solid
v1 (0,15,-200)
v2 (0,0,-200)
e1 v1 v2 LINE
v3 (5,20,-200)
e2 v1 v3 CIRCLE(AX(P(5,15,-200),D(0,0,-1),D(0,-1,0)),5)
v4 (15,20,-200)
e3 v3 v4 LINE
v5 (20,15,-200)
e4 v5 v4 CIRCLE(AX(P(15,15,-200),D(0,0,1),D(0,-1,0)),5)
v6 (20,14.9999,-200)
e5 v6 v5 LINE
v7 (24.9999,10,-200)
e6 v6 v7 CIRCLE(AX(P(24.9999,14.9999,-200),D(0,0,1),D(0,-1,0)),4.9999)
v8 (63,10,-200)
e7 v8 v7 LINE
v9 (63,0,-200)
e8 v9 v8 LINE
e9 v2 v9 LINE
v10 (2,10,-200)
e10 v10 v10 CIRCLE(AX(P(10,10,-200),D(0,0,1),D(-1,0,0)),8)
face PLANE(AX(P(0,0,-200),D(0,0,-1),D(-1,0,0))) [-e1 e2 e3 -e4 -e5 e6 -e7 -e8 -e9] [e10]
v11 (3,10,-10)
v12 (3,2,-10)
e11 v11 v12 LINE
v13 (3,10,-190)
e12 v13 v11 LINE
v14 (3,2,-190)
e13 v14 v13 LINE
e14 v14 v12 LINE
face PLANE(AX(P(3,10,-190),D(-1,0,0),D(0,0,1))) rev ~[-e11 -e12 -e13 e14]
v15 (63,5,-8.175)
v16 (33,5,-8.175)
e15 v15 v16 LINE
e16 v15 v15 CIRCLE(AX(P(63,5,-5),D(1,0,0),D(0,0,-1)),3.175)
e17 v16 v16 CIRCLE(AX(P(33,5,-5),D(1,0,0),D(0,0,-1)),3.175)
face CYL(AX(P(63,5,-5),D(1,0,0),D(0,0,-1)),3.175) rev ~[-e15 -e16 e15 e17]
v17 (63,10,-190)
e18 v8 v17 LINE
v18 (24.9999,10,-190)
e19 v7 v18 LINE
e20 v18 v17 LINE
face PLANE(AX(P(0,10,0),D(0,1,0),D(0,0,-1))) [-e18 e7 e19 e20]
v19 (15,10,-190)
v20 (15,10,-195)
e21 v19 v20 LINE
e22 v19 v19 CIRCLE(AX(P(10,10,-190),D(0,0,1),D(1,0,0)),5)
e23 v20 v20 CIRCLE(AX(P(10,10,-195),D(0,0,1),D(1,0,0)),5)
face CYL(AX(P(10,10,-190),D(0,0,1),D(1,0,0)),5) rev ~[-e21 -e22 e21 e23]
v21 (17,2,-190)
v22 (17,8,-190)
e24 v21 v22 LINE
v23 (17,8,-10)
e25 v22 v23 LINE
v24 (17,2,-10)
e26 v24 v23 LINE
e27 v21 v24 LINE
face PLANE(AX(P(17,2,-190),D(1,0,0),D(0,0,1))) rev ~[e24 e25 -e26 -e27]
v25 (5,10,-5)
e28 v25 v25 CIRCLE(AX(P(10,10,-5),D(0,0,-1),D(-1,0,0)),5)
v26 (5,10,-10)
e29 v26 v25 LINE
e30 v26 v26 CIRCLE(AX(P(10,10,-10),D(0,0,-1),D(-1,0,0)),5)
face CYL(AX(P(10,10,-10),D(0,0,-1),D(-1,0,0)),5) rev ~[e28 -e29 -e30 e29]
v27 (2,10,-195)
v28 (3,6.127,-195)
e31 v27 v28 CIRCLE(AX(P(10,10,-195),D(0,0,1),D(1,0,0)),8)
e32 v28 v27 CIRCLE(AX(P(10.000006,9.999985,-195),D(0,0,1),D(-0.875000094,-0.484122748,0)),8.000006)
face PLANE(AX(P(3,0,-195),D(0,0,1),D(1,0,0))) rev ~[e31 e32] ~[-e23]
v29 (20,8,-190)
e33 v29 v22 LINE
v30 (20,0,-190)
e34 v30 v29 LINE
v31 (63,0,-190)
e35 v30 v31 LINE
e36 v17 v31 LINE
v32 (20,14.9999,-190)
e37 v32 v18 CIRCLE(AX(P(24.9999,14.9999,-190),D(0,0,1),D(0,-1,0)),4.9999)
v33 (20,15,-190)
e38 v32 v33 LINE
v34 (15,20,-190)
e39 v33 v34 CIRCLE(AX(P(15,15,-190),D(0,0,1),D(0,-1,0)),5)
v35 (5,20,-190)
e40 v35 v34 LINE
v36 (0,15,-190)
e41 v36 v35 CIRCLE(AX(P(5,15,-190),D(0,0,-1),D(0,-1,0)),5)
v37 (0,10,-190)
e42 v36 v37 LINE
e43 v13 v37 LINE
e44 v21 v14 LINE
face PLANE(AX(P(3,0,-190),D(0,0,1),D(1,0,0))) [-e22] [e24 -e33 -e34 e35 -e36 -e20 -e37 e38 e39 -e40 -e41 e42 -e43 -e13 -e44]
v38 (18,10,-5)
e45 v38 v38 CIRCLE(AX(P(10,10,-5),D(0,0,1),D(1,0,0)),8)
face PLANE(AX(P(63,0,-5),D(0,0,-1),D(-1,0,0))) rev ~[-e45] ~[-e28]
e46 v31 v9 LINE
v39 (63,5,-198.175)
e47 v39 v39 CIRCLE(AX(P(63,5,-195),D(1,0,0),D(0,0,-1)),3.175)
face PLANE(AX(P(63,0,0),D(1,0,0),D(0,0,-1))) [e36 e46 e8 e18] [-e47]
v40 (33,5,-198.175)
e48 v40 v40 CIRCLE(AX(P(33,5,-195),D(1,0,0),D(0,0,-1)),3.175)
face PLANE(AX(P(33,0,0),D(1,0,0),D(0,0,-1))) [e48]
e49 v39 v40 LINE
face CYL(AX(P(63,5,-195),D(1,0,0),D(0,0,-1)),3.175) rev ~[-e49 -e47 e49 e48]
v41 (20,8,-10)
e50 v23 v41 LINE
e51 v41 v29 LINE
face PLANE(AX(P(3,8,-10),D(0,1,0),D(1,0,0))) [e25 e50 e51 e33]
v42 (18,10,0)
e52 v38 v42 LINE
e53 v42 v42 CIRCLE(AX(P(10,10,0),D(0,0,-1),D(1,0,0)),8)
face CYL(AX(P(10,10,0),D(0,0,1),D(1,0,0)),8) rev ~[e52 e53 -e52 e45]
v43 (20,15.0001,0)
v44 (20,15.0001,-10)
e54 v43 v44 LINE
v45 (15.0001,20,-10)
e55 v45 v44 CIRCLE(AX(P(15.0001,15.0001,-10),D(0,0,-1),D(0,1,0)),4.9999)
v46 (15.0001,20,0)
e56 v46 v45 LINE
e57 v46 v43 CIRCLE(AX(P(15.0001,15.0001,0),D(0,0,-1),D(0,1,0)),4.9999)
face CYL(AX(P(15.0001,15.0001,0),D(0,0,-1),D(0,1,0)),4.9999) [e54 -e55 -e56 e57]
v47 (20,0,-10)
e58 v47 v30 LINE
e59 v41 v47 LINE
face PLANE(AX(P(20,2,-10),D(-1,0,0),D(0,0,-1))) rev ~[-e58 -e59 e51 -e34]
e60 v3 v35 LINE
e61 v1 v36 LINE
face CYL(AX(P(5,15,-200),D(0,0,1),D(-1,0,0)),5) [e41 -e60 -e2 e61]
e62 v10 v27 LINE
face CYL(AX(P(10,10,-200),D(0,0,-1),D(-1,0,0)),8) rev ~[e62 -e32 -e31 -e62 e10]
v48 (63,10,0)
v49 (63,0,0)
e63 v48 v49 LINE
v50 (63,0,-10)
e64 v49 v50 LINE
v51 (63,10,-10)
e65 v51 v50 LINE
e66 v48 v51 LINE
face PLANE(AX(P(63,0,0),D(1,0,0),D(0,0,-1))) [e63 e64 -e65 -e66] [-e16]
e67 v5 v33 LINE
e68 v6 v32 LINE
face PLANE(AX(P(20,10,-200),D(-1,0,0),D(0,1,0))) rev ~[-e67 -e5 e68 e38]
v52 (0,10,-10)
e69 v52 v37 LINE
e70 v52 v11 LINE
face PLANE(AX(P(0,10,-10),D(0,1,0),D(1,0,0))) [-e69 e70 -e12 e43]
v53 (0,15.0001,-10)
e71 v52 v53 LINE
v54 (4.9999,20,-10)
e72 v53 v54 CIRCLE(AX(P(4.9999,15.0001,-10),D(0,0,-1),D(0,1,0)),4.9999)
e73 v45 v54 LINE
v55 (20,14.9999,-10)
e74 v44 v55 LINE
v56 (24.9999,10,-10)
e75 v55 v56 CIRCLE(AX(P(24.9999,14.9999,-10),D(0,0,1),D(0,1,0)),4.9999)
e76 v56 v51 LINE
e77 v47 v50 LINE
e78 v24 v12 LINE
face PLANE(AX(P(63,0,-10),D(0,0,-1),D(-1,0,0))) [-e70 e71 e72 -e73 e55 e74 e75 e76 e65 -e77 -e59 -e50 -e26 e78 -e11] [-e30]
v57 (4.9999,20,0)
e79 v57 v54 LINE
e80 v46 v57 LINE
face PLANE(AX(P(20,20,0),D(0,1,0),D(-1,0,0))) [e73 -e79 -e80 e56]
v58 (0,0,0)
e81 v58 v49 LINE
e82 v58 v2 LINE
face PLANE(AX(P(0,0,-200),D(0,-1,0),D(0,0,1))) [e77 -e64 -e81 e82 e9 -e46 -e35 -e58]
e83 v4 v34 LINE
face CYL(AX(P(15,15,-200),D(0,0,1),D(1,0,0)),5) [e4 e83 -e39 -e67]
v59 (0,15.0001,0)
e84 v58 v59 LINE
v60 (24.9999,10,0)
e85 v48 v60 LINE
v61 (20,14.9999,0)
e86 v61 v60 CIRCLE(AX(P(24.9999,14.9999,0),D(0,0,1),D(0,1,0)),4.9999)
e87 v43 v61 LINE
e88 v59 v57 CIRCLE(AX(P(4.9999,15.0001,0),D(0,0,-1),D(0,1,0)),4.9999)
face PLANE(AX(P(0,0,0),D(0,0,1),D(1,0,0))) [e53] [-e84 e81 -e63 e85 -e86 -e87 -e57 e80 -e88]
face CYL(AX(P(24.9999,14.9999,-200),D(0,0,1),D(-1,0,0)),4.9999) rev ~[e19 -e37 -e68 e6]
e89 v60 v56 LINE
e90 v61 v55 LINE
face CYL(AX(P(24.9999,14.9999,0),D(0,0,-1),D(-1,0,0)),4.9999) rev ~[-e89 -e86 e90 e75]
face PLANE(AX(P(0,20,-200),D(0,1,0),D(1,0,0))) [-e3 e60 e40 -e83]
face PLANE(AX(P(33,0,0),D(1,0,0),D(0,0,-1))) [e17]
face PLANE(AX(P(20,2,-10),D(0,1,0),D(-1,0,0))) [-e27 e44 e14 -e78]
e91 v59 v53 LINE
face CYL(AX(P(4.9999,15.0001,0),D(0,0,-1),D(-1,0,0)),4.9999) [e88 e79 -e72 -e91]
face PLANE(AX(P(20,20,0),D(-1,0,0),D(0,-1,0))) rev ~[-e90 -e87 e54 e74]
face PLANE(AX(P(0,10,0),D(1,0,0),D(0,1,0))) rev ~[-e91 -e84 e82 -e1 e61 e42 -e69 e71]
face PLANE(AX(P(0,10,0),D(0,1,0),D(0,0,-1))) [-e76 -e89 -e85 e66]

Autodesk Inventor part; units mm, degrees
ref_plane "YZ Plane" through (0, 0, 0) normal (1, 0, 0) x (0, 1, 0)
ref_plane "XZ Plane" through (0, 0, 0) normal (0, 1, 0) x (-1, 0, 0)
ref_plane "XY Plane" through (0, 0, 0) normal (0, 0, 1) x (1, 0, 0)
sketch "Sketch1" plane through (0, 0, 0) normal (1, 0, 0) x (0, 1, 0)
  line L0 (0, 0) -> (10, 0)
  line L1 (10, 0) -> (10, -200)
  line L2 (10, -200) -> (0, -200)
  line L3 (0, -200) -> (0, 0)
  dimension "d0" = 10
  dimension "d1" = 200
extrude "Extrusion1" add sketch "Sketch1" along normal blind 3
sketch "Sketch2" plane through (3, 0, 0) normal (1, 0, 0) x (0, 0, -1)
  line L0 (0, 10) -> (0, 0) projected
  line L1 (0, 0) -> (200, 0) projected
  line L2 (0, 10) -> (10, 10)
  line L3 (10, 10) -> (10, 0)
  line L4 (10, 0) -> (0, 0)
  line L5 (0, 0) -> (0, 10)
  line L6 (200, 0) -> (200, 10) projected
  line L7 (200, 10) -> (190, 10)
  line L8 (190, 10) -> (190, 0)
  line L9 (190, 0) -> (200, 0)
  line L10 (200, 0) -> (200, 10)
  dimension "d4" = 10
  dimension "d5" = 10
extrude "Extrusion2" add sketch "Sketch2" along normal blind 60
sketch "Sketch3" plane through (63, 0, 0) normal (1, 0, 0) x (0, 0, -1)
  line L0 (0, 10) -> (200, 10) construction
  line L1 (10, 0) -> (190, 0) construction
  line L2 (0, 10) -> (10, 0) construction
  line L3 (5, 5) -> (0, 5) construction
  line L4 (0, 0) -> (0, 10) construction
  circle A0 centre (5, 5) radius 3.175
  line L5 (200, 10) -> (190, 10) construction
  line L6 (200, 0) -> (200, 10) construction
  line L7 (190, 10) -> (200, 0) construction
  circle A1 centre (195, 5) radius 3.175
  dimension "d8" = 6.35
  dimension "d9" = 6.35
extrude "Extrusion3" cut sketch "Sketch3" against normal blind 30
sketch "Sketch4" plane through (0, 0, -200) normal (0, 0, -1) x (-1, 0, 0)
  line L0 (0, 0) -> (-63, 0) construction
  line L1 (0, 0) -> (-20, 0) construction
  line L2 (-20, 0) -> (-20, 20) construction
  line L3 (-20, 20) -> (0, 20) construction
  line L4 (0, 20) -> (0, 0) construction
  line L5 (-3, 10) -> (-63, 10) construction
  circle A0 centre (-10, 10) radius 8 construction
  line L6 (0, 10) -> (-63, 10) projected
  arc A1 (-2, 10) -> (-18, 10) centre (-10, 10) ccw
  line L7 (-20, 10) -> (-18, 10)
  line L8 (-2, 10) -> (0, 10)
  line L9 (0, 20) -> (-20, 20)
  line L10 (-20, 10) -> (-20, 20)
  line L11 (0, 20) -> (0, 10)
  dimension "d12" = 20
  dimension "d13" = 20
  dimension "d14" = 16
extrude "Extrusion4" add sketch "Sketch4" against normal blind 10 contours L6 A1 L10 L9 L11
fillet "Fillet1" radius 5 2 edges at (0, 20, -195) (20, 20, -195)
fillet "Fillet2" radius 5 1 edges at (20, 10, -195)
sketch "Sketch5" plane through (63, 0, -200) normal (0, 0, -1) x (-1, 0, 0)
  arc A0 (61, 10) -> (45, 10) centre (53, 10) ccw projected
  circle A1 centre (53, 10) radius 8
  point P0 (63, 0)
extrude "Extrusion5" cut sketch "Sketch5" against normal blind 200
sketch "Sketch6" plane through (3, 0, -190) normal (0, 0, 1) x (1, 0, 0)
  arc A0 (0, 6.127) -> (-1, 10) centre (7, 10) ccw projected
  circle A1 centre (7, 10) radius 8
  circle A2 centre (7, 10) radius 5
  point P0 (-3, 0)
  dimension "d21" = 10
extrude "Extrusion6" add sketch "Sketch6" against normal blind 5
sketch "Sketch7" plane through (0, 0, 0) normal (0, 0, 1) x (1, 0, 0)
  line L0 (0, 0) -> (63, 0) construction
  line L1 (0, 0) -> (20, 0) construction
  line L2 (20, 0) -> (20, 20) construction
  line L3 (20, 20) -> (0, 20) construction
  line L4 (0, 20) -> (0, 0) construction
  circle A0 centre (10, 10) radius 8 construction
  line L5 (2, 10) -> (0, 10) projected
  line L6 (2, 10) -> (0, 10)
  line L7 (0, 10) -> (0, 20)
  line L8 (20, 20) -> (0, 20)
  line L9 (20, 20) -> (20, 10)
  line L10 (18, 10) -> (63, 10) projected
  line L11 (18, 10) -> (20, 10)
  arc A1 (18, 10) -> (2, 10) centre (10, 10) ccw
  dimension "d24" = 20
  dimension "d25" = 20
  dimension "d26" = 16
extrude "Extrusion7" add sketch "Sketch7" against normal blind 10
fillet "Fillet3" radius 5 3 edges at (0, 20, -5) (20, 20, -5) (20, 10, -5)
sketch "Sketch8" plane through (63, 0, -10) normal (0, 0, -1) x (-1, 0, 0)
  circle A0 centre (53, 10) radius 5 projected
  circle A1 centre (53, 10) radius 5
  circle A2 centre (53, 10) radius 8
  point P0 (63, 0)
extrude "Extrusion8" add sketch "Sketch8" against normal blind 5
sketch "Sketch9" plane through (63, 0, -10) normal (0, 0, -1) x (-1, 0, 0)
  line L0 (63, 0) -> (43, 0)
  line L1 (43, 0) -> (43, 2)
  line L2 (43, 2) -> (63, 2)
  line L3 (63, 2) -> (63, 0)
  dimension "d32" = 20
  dimension "d33" = 2
extrude "Extrusion9" add sketch "Sketch9" along normal blind 190
sketch "Sketch10" plane through (3, 2, -10) normal (0, 1, 0) x (1, 0, 0)
  line L0 (17, 180) -> (14, 180)
  line L1 (14, 180) -> (14, 0)
  line L2 (14, 0) -> (17, 0)
  line L3 (17, 0) -> (17, 180)
  point P0 (-3, -10)
  dimension "d36" = 3
sketch "Sketch11" plane through (0, 10, -10) normal (0, 1, 0) x (1, 0, 0)
  line L0 (3, 180) -> (3, 0) projected
  line L1 (0, 180.0445) -> (3, 180.0445)
  line L2 (3, 180.0445) -> (3, 0)
  line L3 (3, 0) -> (0, 0)
  line L4 (0, 0) -> (0, 180.0445)
  point P0 (0, -10)
extrude "Extrusion10" add sketch "Sketch11" against normal blind 10
extrude "Extrusion11" add sketch "Sketch10" along normal blind 6
properties part number "rearAxelHolder 6-5"
